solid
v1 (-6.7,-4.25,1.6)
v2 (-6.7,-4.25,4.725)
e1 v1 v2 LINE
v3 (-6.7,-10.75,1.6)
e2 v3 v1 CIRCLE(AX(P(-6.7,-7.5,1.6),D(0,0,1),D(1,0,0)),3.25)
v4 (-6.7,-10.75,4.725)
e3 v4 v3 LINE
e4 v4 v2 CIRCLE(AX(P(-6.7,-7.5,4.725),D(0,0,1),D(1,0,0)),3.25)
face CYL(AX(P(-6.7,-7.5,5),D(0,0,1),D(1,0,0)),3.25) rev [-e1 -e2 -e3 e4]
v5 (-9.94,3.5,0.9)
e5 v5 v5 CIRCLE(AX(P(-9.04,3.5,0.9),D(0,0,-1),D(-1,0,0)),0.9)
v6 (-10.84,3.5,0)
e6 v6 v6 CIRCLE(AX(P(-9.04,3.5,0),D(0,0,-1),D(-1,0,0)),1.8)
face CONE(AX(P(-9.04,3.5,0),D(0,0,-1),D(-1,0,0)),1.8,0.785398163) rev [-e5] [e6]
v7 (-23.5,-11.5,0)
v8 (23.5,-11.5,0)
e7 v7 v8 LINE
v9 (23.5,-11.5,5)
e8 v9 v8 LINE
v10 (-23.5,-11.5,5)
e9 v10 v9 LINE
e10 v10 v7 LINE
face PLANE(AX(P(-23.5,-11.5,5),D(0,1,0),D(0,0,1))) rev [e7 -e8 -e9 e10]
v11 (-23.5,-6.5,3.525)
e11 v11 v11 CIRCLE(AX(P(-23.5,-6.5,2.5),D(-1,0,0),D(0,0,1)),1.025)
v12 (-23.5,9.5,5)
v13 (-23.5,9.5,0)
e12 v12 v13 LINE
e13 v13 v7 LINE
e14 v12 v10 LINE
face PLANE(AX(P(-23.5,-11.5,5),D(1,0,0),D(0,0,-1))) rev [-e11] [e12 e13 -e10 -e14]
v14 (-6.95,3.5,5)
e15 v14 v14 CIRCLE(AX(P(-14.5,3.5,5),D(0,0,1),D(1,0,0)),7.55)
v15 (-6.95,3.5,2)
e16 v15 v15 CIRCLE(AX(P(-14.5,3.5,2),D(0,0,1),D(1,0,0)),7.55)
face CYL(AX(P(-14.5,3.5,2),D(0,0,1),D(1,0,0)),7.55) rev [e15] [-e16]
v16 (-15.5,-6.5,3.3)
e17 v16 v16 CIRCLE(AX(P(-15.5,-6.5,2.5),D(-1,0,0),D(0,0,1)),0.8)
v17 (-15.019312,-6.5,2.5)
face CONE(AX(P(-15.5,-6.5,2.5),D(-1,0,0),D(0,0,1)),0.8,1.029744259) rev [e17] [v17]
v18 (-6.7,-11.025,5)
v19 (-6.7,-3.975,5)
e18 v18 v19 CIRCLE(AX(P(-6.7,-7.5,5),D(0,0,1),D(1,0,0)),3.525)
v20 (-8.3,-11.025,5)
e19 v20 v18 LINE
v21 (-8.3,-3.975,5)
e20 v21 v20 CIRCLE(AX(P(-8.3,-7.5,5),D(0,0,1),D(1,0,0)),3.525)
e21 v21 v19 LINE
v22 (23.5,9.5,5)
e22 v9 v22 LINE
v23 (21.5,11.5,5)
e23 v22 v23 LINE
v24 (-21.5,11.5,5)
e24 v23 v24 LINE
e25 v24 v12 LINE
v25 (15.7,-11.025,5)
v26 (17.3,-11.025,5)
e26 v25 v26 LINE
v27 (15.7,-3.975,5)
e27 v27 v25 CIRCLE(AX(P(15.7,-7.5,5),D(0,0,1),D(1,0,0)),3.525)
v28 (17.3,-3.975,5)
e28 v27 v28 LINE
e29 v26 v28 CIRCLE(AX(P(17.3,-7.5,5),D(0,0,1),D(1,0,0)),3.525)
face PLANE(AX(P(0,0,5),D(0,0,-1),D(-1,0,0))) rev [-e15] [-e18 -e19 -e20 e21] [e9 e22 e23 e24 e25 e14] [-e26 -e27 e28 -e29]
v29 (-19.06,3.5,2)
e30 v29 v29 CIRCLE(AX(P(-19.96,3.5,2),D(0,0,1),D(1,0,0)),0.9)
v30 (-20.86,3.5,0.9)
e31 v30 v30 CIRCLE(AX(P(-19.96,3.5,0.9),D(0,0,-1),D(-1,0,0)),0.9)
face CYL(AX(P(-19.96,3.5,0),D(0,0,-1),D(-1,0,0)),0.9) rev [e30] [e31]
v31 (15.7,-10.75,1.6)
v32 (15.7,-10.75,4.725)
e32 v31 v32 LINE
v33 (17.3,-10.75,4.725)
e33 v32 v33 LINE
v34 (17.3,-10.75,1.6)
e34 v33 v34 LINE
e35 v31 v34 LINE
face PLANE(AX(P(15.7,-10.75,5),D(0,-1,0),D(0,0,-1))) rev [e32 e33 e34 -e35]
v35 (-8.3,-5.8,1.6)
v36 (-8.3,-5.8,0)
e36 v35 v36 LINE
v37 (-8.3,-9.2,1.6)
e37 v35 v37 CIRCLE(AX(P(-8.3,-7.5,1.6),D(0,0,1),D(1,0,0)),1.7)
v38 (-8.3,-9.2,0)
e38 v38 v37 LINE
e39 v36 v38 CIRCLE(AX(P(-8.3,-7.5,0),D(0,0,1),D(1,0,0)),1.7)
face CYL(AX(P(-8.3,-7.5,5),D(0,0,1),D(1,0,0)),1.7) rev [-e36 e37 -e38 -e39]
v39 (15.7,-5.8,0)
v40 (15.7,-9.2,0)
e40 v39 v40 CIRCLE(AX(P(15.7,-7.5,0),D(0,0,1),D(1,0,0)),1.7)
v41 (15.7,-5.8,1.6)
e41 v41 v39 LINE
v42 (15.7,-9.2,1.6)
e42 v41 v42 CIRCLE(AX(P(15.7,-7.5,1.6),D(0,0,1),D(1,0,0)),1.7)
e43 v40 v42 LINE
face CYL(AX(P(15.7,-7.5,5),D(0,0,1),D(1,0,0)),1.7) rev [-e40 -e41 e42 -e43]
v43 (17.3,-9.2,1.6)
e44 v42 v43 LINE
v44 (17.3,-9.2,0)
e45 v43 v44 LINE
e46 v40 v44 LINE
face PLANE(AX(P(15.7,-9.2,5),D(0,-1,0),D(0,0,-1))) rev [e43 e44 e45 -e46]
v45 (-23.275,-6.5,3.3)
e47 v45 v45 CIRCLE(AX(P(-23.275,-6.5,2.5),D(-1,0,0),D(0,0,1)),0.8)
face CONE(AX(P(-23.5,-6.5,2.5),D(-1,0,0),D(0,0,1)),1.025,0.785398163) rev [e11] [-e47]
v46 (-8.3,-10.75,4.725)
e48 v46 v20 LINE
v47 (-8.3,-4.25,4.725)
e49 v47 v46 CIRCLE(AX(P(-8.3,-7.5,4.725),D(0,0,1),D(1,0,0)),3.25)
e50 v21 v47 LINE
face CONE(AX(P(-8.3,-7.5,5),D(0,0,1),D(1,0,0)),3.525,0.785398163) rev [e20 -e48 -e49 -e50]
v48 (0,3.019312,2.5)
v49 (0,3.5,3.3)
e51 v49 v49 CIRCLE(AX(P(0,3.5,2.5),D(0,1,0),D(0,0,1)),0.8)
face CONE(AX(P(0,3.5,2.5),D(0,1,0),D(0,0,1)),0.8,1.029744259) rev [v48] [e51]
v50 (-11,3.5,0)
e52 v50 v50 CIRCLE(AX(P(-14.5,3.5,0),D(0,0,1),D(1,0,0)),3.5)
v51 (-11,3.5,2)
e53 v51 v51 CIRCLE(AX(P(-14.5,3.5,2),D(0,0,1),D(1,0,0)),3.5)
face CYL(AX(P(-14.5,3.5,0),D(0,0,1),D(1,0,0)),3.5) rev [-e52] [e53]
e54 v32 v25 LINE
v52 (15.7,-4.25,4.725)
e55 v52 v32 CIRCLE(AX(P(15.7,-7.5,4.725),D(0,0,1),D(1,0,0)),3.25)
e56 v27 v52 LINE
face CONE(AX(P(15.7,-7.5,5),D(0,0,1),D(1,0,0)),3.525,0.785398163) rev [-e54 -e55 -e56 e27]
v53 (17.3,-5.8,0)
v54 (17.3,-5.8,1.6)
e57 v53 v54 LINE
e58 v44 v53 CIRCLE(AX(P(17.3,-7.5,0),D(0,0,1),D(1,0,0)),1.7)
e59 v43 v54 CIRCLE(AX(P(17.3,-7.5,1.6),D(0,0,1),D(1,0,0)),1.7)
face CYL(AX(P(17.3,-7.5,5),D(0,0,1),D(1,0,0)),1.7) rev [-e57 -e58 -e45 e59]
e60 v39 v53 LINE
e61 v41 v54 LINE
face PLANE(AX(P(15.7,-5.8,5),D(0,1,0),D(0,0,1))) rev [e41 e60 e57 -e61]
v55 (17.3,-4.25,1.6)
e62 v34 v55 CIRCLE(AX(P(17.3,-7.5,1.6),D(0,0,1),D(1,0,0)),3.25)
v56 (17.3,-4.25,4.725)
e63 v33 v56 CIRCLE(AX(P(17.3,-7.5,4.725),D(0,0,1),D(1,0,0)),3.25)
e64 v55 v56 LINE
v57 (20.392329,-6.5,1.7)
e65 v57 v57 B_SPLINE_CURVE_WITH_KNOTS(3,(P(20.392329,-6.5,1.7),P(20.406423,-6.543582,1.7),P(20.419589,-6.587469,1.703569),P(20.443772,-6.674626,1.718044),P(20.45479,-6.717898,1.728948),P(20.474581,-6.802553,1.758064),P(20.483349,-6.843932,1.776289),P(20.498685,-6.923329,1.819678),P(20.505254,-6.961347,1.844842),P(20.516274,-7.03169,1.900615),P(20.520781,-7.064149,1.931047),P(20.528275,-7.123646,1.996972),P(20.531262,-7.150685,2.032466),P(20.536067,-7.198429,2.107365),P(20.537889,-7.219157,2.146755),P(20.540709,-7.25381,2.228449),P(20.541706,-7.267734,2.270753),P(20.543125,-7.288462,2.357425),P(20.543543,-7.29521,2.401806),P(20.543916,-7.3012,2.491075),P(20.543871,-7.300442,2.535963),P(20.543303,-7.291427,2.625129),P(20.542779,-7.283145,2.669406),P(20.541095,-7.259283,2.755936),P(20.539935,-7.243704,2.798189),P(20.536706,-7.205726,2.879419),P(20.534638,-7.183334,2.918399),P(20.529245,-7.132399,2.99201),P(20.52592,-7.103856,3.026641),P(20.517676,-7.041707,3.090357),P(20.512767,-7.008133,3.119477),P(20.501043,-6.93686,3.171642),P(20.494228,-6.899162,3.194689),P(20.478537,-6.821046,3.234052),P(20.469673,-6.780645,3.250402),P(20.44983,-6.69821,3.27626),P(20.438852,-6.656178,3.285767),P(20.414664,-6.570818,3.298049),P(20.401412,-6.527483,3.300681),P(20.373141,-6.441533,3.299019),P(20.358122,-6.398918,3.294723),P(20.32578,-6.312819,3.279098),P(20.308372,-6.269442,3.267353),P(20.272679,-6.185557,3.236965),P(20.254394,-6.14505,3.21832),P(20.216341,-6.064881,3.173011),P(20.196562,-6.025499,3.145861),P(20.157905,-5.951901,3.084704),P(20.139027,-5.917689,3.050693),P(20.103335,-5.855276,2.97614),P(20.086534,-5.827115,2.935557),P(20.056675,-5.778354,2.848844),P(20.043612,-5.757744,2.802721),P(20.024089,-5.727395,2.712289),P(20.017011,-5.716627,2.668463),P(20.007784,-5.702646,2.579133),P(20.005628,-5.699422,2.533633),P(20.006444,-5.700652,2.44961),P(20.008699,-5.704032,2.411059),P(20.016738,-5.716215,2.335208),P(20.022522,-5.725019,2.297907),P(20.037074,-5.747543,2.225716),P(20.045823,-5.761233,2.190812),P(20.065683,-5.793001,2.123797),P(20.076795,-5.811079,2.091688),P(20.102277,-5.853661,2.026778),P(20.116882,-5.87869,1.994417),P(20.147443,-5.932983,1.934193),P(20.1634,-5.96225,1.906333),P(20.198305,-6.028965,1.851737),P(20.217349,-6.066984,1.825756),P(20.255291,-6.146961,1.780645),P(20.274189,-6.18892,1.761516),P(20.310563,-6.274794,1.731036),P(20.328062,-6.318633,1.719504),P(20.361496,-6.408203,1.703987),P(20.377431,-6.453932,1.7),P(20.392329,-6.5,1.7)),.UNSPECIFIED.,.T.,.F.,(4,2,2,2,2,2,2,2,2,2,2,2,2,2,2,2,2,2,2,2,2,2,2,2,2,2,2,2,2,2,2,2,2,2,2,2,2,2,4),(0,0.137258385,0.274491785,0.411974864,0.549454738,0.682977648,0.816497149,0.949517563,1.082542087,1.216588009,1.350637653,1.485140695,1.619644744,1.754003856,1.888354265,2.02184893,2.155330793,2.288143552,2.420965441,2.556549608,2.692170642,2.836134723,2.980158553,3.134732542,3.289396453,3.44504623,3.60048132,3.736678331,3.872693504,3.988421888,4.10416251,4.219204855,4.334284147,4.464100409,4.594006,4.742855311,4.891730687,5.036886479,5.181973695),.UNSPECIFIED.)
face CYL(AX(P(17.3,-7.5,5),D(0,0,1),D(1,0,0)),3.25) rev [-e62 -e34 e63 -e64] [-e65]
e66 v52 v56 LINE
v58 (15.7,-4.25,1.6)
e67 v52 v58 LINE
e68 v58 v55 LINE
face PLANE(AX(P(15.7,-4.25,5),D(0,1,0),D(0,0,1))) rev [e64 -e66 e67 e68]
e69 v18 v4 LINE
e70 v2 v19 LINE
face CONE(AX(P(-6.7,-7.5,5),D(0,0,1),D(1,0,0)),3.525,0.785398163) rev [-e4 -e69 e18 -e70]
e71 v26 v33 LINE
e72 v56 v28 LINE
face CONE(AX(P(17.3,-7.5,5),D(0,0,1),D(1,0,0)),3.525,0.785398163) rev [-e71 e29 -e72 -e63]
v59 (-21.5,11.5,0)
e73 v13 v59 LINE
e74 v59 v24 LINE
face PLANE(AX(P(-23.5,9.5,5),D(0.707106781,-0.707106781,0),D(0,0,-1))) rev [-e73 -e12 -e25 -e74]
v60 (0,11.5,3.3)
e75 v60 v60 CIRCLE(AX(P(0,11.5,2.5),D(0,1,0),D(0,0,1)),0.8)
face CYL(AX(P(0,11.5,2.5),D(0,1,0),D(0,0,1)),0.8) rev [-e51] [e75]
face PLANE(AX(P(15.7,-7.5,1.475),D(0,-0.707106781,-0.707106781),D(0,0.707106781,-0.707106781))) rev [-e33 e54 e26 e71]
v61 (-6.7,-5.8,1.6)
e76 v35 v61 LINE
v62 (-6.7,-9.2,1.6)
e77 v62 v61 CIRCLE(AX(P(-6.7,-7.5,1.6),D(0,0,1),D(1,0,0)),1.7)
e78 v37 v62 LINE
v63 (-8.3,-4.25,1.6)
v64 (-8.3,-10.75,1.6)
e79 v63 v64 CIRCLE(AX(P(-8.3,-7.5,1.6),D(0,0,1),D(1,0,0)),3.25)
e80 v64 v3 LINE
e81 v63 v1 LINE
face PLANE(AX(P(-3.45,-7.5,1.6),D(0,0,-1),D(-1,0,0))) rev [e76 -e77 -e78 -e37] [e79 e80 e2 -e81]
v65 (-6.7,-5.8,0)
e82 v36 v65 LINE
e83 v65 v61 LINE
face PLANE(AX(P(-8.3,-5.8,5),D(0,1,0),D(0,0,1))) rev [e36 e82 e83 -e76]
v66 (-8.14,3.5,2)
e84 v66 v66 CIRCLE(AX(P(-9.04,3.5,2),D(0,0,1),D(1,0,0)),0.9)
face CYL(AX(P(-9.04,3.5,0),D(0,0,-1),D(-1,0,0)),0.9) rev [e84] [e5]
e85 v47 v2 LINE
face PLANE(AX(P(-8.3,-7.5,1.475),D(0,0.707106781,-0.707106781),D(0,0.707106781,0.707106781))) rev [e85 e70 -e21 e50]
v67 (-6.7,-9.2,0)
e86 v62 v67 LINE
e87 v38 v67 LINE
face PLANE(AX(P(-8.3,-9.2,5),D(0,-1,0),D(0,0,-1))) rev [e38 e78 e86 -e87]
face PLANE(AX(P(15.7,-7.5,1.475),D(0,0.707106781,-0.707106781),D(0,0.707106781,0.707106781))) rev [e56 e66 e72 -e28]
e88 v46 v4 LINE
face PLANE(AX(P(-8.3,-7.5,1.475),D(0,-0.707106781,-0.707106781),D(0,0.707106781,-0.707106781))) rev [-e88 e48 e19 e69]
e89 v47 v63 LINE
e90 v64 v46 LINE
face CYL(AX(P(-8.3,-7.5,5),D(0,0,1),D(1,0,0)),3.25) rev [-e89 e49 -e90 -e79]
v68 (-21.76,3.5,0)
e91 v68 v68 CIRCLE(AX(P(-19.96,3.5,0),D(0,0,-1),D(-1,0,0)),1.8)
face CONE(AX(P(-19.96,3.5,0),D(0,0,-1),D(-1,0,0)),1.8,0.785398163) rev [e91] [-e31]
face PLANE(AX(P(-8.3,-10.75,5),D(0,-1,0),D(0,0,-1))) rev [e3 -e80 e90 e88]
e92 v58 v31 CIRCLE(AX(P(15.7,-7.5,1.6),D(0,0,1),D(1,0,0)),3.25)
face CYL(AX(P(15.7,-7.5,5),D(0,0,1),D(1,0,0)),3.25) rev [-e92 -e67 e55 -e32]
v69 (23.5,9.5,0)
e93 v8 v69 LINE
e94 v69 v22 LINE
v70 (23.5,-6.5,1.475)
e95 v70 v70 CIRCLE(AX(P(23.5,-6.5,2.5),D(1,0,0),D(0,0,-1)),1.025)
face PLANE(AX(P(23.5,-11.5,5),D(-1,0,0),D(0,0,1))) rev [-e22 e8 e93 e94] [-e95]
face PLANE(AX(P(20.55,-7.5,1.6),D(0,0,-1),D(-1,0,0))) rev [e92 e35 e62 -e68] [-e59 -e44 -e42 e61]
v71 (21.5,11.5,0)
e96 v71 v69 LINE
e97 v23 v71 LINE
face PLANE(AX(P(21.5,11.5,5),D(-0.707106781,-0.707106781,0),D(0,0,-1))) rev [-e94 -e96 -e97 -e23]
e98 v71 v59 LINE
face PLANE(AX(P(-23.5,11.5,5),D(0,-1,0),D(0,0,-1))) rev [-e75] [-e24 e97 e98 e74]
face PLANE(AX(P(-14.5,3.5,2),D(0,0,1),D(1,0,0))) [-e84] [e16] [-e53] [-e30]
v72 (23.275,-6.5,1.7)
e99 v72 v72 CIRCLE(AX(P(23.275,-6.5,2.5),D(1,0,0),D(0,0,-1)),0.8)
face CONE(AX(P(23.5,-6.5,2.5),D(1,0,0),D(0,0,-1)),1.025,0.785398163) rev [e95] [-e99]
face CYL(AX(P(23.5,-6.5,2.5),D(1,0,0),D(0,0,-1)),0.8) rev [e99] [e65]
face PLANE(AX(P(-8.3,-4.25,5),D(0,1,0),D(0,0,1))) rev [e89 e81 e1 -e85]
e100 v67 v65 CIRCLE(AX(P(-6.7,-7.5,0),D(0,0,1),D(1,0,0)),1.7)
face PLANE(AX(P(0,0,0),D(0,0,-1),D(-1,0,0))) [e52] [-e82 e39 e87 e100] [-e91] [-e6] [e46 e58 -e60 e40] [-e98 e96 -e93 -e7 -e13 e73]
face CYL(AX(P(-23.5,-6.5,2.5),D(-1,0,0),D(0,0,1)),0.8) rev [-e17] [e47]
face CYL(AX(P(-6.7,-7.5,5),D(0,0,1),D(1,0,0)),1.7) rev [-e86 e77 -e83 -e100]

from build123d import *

# Parameters (mm, degrees)
SKIZZE1_W                                            = 47
SKIZZE1_H                                            = 23
AUFSATZ_LINEAR_AUSTRAGEN1_DEPTH                      = 5
SKIZZE2_R                                            = 7.55
SCHNITT_LINEAR_AUSTRAGEN1_DEPTH                      = 3
SKIZZE3_R                                            = 3.5
SCHNITT_LINEAR_AUSTRAGEN2_DEPTH                      = 27.636441204
FORMSENKUNG_F_R_M1_6_SENKSCHRAUBE_MIT_SC_D           = 1.8
FORMSENKUNG_F_R_M1_6_SENKSCHRAUBE_MIT_SC_CSINK_D     = 3.6
FORMSENKUNG_F_R_M1_6_SENKSCHRAUBE_MIT_SC_CSINK_ANGLE = 90
M2_GEWINDEBOHRUNG1_D                                 = 1.6
M2_GEWINDEBOHRUNG1_DEPTH                             = 8
M2_GEWINDEBOHRUNG1_CSINK_D                           = 2.05
M2_GEWINDEBOHRUNG1_CSINK_ANGLE                       = 90
M2_GEWINDEBOHRUNG1_TIP                               = 0.480688495
M2_GEWINDEBOHRUNG2_D                                 = 1.6
M2_GEWINDEBOHRUNG2_DEPTH                             = 8
M2_GEWINDEBOHRUNG2_CSINK_D                           = 2.05
M2_GEWINDEBOHRUNG2_CSINK_ANGLE                       = 90
M2_GEWINDEBOHRUNG2_TIP                               = 0.480688495
M2_GEWINDEBOHRUNG3_D                                 = 1.6
M2_GEWINDEBOHRUNG3_DEPTH                             = 8
M2_GEWINDEBOHRUNG3_TIP                               = 0.480688495
FASE1_SIZE                                           = 2
STIRNSENKUNG_START                                   = 1.6
STIRNSENKUNG_LANGLOCH_F_R_M3_ZYLINDERSCH_DEPTH       = 3.4
STIRNSENKUNG_START_2                                 = -1
STIRNSENKUNG_LANGLOCH_F_R_M3_ZYLINDE_3_DEPTH         = 2.6


with BuildPart() as part:
    # Skizze1 → Aufsatz-Linear austragen1 (new body)
    with BuildSketch(Plane.XY):
        Rectangle(SKIZZE1_W, SKIZZE1_H)
    extrude(amount=AUFSATZ_LINEAR_AUSTRAGEN1_DEPTH)

    # Skizze2 → Schnitt-Linear austragen1 (cut)
    with BuildSketch(Plane.XY.offset(5)):
        with Locations((-14.5, 3.5)):
            Circle(SKIZZE2_R)
    extrude(amount=-SCHNITT_LINEAR_AUSTRAGEN1_DEPTH, mode=Mode.SUBTRACT)

    # Skizze3 → Schnitt-Linear austragen2 (cut, through all)
    with BuildSketch(Plane.XY.offset(5)):
        with Locations((-14.5, 3.5)):
            Circle(SKIZZE3_R)
    extrude(amount=-SCHNITT_LINEAR_AUSTRAGEN2_DEPTH, mode=Mode.SUBTRACT)

    # Formsenkung für M1.6 Senkschraube mit Schlitz/Kreuzschlitz1 (through all)
    with Locations(Plane(origin=(0, 0, 0), x_dir=(-1, 0, 0), z_dir=(0, 0, -1))):
        with Locations((9.04, 3.5), (19.96, 3.5)):
            CounterSinkHole(FORMSENKUNG_F_R_M1_6_SENKSCHRAUBE_MIT_SC_D / 2, FORMSENKUNG_F_R_M1_6_SENKSCHRAUBE_MIT_SC_CSINK_D / 2, counter_sink_angle=FORMSENKUNG_F_R_M1_6_SENKSCHRAUBE_MIT_SC_CSINK_ANGLE)

    # M2 Gewindebohrung1
    with Locations(Plane.ZY.offset(23.5)):
        with Locations((2.5, -6.5)):
            CounterSinkHole(M2_GEWINDEBOHRUNG1_D / 2, M2_GEWINDEBOHRUNG1_CSINK_D / 2, depth=M2_GEWINDEBOHRUNG1_DEPTH, counter_sink_angle=M2_GEWINDEBOHRUNG1_CSINK_ANGLE)
            with Locations((0, 0, -(M2_GEWINDEBOHRUNG1_DEPTH + M2_GEWINDEBOHRUNG1_TIP / 2))):  # 118° drill point
                Cone(0, M2_GEWINDEBOHRUNG1_D / 2, M2_GEWINDEBOHRUNG1_TIP, mode=Mode.SUBTRACT)

    # M2 Gewindebohrung2
    with Locations(Plane(origin=(23.5, 0, 0), x_dir=(0, 0, -1), z_dir=(1, 0, 0))):
        with Locations((-2.5, -6.5)):
            CounterSinkHole(M2_GEWINDEBOHRUNG2_D / 2, M2_GEWINDEBOHRUNG2_CSINK_D / 2, depth=M2_GEWINDEBOHRUNG2_DEPTH, counter_sink_angle=M2_GEWINDEBOHRUNG2_CSINK_ANGLE)
            with Locations((0, 0, -(M2_GEWINDEBOHRUNG2_DEPTH + M2_GEWINDEBOHRUNG2_TIP / 2))):  # 118° drill point
                Cone(0, M2_GEWINDEBOHRUNG2_D / 2, M2_GEWINDEBOHRUNG2_TIP, mode=Mode.SUBTRACT)

    # M2 Gewindebohrung3
    with Locations(Plane(origin=(0, 11.5, 0), x_dir=(1, 0, 0), z_dir=(0, 1, 0))):
        with Locations((0, -2.5)):
            Hole(M2_GEWINDEBOHRUNG3_D / 2, depth=M2_GEWINDEBOHRUNG3_DEPTH)
            with Locations((0, 0, -(M2_GEWINDEBOHRUNG3_DEPTH + M2_GEWINDEBOHRUNG3_TIP / 2))):  # 118° drill point
                Cone(0, M2_GEWINDEBOHRUNG3_D / 2, M2_GEWINDEBOHRUNG3_TIP, mode=Mode.SUBTRACT)

    # Fase1
    fase1_edges = [part.edges().sort_by_distance(p)[0] for p in [
        (-23.5, 11.5, 2.5),
        (23.5, 11.5, 2.5),
    ]]
    chamfer(fase1_edges, length=FASE1_SIZE)

    # Stirnsenkung Langloch für M3 Zylinderschraube mit Innensechskant2: read off the stored shape, not the designer's step
    # Stirnsenkung Langloch f_r M3 Zylinde 2 → Stirnsenkung Langloch für M3 Zylinderschraube mit Innensechskant2 (cut)
    with BuildSketch(Plane.XY.offset(STIRNSENKUNG_START)):
        with BuildLine():
            Line((-8.3, -10.75), (-6.7, -10.75))
            ThreePointArc((-6.7, -10.75), (-3.45, -7.5), (-6.7, -4.25))
            Line((-6.7, -4.25), (-8.3, -4.25))
            ThreePointArc((-8.3, -4.25), (-11.55, -7.5), (-8.3, -10.75))
        make_face()
        with BuildLine():
            ThreePointArc((17.3, -10.75), (20.55, -7.5), (17.3, -4.25))
            Line((17.3, -4.25), (15.7, -4.25))
            ThreePointArc((15.7, -4.25), (12.45, -7.5), (15.7, -10.75))
            Line((15.7, -10.75), (17.3, -10.75))
        make_face()
    extrude(amount=STIRNSENKUNG_LANGLOCH_F_R_M3_ZYLINDERSCH_DEPTH, mode=Mode.SUBTRACT)

    # Stirnsenkung Langloch f_r M3 Zylinde 3 o → Stirnsenkung Langloch f_r M3 Zylinde 3 (cut)
    with BuildSketch(Plane.XY.offset(STIRNSENKUNG_START_2)):
        with BuildLine():
            Line((-8.3, -9.2), (-6.7, -9.2))
            ThreePointArc((-6.7, -9.2), (-5, -7.5), (-6.7, -5.8))
            Line((-6.7, -5.8), (-8.3, -5.8))
            ThreePointArc((-8.3, -5.8), (-10, -7.5), (-8.3, -9.2))
        make_face()
        with BuildLine():
            ThreePointArc((17.3, -9.2), (19, -7.5), (17.3, -5.8))
            Line((17.3, -5.8), (15.7, -5.8))
            ThreePointArc((15.7, -5.8), (14, -7.5), (15.7, -9.2))
            Line((15.7, -9.2), (17.3, -9.2))
        make_face()
    extrude(amount=STIRNSENKUNG_LANGLOCH_F_R_M3_ZYLINDE_3_DEPTH, mode=Mode.SUBTRACT)

    # Stirnsenkung Langloch f_r M3 Zylinde 4: loft between two sections, ruled curve by curve
    stirnsenkung_langloch_f_r_m3_zylinde_4_from = [
        Edge.make_three_point_arc((-6.7, -10.75, 4.725), (-4.401902961, -9.798097039, 4.725), (-3.45, -7.5, 4.725)),
        Edge.make_three_point_arc((-3.45, -7.5, 4.725), (-4.401902961, -5.201902961, 4.725), (-6.7, -4.25, 4.725)),
        Edge.make_three_point_arc((-8.3, -4.25, 4.725), (-10.598097039, -5.201902961, 4.725), (-11.55, -7.5, 4.725)),
        Edge.make_three_point_arc((-11.55, -7.5, 4.725), (-10.598097039, -9.798097039, 4.725), (-8.3, -10.75, 4.725)),
        Edge.make_line((-6.7, -4.25, 4.725), (-8.3, -4.25, 4.725)),
        Edge.make_line((-6.7, -10.75, 4.725), (-8.3, -10.75, 4.725)),
    ]
    stirnsenkung_langloch_f_r_m3_zylinde_4_to = [
        Edge.make_three_point_arc((-6.7, -11.025, 5), (-4.207448596, -9.992551404, 5), (-3.175, -7.5, 5)),
        Edge.make_three_point_arc((-3.175, -7.5, 5), (-4.207448596, -5.007448596, 5), (-6.7, -3.975, 5)),
        Edge.make_three_point_arc((-8.3, -3.975, 5), (-10.792551404, -5.007448596, 5), (-11.825, -7.5, 5)),
        Edge.make_three_point_arc((-11.825, -7.5, 5), (-10.792551404, -9.992551404, 5), (-8.3, -11.025, 5)),
        Edge.make_line((-6.7, -3.975, 5), (-8.3, -3.975, 5)),
        Edge.make_line((-6.7, -11.025, 5), (-8.3, -11.025, 5)),
    ]
    stirnsenkung_langloch_f_r_m3_zylinde_4 = Solid(Shell([*[Face.make_surface_from_curves(stirnsenkung_langloch_f_r_m3_zylinde_4_from[k], stirnsenkung_langloch_f_r_m3_zylinde_4_to[k]) for k in range(6)], Face(Wire(stirnsenkung_langloch_f_r_m3_zylinde_4_from)), Face(Wire(stirnsenkung_langloch_f_r_m3_zylinde_4_to))]))
    add(stirnsenkung_langloch_f_r_m3_zylinde_4, mode=Mode.SUBTRACT)

    # Stirnsenkung Langloch f_r M3 Zylinde 5: loft between two sections, ruled curve by curve
    stirnsenkung_langloch_f_r_m3_zylinde_5_from = [
        Edge.make_three_point_arc((17.3, -10.75, 4.725), (19.598097039, -9.798097039, 4.725), (20.55, -7.5, 4.725)),
        Edge.make_three_point_arc((20.55, -7.5, 4.725), (19.598097039, -5.201902961, 4.725), (17.3, -4.25, 4.725)),
        Edge.make_three_point_arc((15.7, -4.25, 4.725), (13.401902961, -5.201902961, 4.725), (12.45, -7.5, 4.725)),
        Edge.make_three_point_arc((12.45, -7.5, 4.725), (13.401902961, -9.798097039, 4.725), (15.7, -10.75, 4.725)),
        Edge.make_line((17.3, -4.25, 4.725), (15.7, -4.25, 4.725)),
        Edge.make_line((17.3, -10.75, 4.725), (15.7, -10.75, 4.725)),
    ]
    stirnsenkung_langloch_f_r_m3_zylinde_5_to = [
        Edge.make_three_point_arc((17.3, -11.025, 5), (19.792551404, -9.992551404, 5), (20.825, -7.5, 5)),
        Edge.make_three_point_arc((20.825, -7.5, 5), (19.792551404, -5.007448596, 5), (17.3, -3.975, 5)),
        Edge.make_three_point_arc((15.7, -3.975, 5), (13.207448596, -5.007448596, 5), (12.175, -7.5, 5)),
        Edge.make_three_point_arc((12.175, -7.5, 5), (13.207448596, -9.992551404, 5), (15.7, -11.025, 5)),
        Edge.make_line((17.3, -3.975, 5), (15.7, -3.975, 5)),
        Edge.make_line((17.3, -11.025, 5), (15.7, -11.025, 5)),
    ]
    stirnsenkung_langloch_f_r_m3_zylinde_5 = Solid(Shell([*[Face.make_surface_from_curves(stirnsenkung_langloch_f_r_m3_zylinde_5_from[k], stirnsenkung_langloch_f_r_m3_zylinde_5_to[k]) for k in range(6)], Face(Wire(stirnsenkung_langloch_f_r_m3_zylinde_5_from)), Face(Wire(stirnsenkung_langloch_f_r_m3_zylinde_5_to))]))
    add(stirnsenkung_langloch_f_r_m3_zylinde_5, mode=Mode.SUBTRACT)


solid = part.part
